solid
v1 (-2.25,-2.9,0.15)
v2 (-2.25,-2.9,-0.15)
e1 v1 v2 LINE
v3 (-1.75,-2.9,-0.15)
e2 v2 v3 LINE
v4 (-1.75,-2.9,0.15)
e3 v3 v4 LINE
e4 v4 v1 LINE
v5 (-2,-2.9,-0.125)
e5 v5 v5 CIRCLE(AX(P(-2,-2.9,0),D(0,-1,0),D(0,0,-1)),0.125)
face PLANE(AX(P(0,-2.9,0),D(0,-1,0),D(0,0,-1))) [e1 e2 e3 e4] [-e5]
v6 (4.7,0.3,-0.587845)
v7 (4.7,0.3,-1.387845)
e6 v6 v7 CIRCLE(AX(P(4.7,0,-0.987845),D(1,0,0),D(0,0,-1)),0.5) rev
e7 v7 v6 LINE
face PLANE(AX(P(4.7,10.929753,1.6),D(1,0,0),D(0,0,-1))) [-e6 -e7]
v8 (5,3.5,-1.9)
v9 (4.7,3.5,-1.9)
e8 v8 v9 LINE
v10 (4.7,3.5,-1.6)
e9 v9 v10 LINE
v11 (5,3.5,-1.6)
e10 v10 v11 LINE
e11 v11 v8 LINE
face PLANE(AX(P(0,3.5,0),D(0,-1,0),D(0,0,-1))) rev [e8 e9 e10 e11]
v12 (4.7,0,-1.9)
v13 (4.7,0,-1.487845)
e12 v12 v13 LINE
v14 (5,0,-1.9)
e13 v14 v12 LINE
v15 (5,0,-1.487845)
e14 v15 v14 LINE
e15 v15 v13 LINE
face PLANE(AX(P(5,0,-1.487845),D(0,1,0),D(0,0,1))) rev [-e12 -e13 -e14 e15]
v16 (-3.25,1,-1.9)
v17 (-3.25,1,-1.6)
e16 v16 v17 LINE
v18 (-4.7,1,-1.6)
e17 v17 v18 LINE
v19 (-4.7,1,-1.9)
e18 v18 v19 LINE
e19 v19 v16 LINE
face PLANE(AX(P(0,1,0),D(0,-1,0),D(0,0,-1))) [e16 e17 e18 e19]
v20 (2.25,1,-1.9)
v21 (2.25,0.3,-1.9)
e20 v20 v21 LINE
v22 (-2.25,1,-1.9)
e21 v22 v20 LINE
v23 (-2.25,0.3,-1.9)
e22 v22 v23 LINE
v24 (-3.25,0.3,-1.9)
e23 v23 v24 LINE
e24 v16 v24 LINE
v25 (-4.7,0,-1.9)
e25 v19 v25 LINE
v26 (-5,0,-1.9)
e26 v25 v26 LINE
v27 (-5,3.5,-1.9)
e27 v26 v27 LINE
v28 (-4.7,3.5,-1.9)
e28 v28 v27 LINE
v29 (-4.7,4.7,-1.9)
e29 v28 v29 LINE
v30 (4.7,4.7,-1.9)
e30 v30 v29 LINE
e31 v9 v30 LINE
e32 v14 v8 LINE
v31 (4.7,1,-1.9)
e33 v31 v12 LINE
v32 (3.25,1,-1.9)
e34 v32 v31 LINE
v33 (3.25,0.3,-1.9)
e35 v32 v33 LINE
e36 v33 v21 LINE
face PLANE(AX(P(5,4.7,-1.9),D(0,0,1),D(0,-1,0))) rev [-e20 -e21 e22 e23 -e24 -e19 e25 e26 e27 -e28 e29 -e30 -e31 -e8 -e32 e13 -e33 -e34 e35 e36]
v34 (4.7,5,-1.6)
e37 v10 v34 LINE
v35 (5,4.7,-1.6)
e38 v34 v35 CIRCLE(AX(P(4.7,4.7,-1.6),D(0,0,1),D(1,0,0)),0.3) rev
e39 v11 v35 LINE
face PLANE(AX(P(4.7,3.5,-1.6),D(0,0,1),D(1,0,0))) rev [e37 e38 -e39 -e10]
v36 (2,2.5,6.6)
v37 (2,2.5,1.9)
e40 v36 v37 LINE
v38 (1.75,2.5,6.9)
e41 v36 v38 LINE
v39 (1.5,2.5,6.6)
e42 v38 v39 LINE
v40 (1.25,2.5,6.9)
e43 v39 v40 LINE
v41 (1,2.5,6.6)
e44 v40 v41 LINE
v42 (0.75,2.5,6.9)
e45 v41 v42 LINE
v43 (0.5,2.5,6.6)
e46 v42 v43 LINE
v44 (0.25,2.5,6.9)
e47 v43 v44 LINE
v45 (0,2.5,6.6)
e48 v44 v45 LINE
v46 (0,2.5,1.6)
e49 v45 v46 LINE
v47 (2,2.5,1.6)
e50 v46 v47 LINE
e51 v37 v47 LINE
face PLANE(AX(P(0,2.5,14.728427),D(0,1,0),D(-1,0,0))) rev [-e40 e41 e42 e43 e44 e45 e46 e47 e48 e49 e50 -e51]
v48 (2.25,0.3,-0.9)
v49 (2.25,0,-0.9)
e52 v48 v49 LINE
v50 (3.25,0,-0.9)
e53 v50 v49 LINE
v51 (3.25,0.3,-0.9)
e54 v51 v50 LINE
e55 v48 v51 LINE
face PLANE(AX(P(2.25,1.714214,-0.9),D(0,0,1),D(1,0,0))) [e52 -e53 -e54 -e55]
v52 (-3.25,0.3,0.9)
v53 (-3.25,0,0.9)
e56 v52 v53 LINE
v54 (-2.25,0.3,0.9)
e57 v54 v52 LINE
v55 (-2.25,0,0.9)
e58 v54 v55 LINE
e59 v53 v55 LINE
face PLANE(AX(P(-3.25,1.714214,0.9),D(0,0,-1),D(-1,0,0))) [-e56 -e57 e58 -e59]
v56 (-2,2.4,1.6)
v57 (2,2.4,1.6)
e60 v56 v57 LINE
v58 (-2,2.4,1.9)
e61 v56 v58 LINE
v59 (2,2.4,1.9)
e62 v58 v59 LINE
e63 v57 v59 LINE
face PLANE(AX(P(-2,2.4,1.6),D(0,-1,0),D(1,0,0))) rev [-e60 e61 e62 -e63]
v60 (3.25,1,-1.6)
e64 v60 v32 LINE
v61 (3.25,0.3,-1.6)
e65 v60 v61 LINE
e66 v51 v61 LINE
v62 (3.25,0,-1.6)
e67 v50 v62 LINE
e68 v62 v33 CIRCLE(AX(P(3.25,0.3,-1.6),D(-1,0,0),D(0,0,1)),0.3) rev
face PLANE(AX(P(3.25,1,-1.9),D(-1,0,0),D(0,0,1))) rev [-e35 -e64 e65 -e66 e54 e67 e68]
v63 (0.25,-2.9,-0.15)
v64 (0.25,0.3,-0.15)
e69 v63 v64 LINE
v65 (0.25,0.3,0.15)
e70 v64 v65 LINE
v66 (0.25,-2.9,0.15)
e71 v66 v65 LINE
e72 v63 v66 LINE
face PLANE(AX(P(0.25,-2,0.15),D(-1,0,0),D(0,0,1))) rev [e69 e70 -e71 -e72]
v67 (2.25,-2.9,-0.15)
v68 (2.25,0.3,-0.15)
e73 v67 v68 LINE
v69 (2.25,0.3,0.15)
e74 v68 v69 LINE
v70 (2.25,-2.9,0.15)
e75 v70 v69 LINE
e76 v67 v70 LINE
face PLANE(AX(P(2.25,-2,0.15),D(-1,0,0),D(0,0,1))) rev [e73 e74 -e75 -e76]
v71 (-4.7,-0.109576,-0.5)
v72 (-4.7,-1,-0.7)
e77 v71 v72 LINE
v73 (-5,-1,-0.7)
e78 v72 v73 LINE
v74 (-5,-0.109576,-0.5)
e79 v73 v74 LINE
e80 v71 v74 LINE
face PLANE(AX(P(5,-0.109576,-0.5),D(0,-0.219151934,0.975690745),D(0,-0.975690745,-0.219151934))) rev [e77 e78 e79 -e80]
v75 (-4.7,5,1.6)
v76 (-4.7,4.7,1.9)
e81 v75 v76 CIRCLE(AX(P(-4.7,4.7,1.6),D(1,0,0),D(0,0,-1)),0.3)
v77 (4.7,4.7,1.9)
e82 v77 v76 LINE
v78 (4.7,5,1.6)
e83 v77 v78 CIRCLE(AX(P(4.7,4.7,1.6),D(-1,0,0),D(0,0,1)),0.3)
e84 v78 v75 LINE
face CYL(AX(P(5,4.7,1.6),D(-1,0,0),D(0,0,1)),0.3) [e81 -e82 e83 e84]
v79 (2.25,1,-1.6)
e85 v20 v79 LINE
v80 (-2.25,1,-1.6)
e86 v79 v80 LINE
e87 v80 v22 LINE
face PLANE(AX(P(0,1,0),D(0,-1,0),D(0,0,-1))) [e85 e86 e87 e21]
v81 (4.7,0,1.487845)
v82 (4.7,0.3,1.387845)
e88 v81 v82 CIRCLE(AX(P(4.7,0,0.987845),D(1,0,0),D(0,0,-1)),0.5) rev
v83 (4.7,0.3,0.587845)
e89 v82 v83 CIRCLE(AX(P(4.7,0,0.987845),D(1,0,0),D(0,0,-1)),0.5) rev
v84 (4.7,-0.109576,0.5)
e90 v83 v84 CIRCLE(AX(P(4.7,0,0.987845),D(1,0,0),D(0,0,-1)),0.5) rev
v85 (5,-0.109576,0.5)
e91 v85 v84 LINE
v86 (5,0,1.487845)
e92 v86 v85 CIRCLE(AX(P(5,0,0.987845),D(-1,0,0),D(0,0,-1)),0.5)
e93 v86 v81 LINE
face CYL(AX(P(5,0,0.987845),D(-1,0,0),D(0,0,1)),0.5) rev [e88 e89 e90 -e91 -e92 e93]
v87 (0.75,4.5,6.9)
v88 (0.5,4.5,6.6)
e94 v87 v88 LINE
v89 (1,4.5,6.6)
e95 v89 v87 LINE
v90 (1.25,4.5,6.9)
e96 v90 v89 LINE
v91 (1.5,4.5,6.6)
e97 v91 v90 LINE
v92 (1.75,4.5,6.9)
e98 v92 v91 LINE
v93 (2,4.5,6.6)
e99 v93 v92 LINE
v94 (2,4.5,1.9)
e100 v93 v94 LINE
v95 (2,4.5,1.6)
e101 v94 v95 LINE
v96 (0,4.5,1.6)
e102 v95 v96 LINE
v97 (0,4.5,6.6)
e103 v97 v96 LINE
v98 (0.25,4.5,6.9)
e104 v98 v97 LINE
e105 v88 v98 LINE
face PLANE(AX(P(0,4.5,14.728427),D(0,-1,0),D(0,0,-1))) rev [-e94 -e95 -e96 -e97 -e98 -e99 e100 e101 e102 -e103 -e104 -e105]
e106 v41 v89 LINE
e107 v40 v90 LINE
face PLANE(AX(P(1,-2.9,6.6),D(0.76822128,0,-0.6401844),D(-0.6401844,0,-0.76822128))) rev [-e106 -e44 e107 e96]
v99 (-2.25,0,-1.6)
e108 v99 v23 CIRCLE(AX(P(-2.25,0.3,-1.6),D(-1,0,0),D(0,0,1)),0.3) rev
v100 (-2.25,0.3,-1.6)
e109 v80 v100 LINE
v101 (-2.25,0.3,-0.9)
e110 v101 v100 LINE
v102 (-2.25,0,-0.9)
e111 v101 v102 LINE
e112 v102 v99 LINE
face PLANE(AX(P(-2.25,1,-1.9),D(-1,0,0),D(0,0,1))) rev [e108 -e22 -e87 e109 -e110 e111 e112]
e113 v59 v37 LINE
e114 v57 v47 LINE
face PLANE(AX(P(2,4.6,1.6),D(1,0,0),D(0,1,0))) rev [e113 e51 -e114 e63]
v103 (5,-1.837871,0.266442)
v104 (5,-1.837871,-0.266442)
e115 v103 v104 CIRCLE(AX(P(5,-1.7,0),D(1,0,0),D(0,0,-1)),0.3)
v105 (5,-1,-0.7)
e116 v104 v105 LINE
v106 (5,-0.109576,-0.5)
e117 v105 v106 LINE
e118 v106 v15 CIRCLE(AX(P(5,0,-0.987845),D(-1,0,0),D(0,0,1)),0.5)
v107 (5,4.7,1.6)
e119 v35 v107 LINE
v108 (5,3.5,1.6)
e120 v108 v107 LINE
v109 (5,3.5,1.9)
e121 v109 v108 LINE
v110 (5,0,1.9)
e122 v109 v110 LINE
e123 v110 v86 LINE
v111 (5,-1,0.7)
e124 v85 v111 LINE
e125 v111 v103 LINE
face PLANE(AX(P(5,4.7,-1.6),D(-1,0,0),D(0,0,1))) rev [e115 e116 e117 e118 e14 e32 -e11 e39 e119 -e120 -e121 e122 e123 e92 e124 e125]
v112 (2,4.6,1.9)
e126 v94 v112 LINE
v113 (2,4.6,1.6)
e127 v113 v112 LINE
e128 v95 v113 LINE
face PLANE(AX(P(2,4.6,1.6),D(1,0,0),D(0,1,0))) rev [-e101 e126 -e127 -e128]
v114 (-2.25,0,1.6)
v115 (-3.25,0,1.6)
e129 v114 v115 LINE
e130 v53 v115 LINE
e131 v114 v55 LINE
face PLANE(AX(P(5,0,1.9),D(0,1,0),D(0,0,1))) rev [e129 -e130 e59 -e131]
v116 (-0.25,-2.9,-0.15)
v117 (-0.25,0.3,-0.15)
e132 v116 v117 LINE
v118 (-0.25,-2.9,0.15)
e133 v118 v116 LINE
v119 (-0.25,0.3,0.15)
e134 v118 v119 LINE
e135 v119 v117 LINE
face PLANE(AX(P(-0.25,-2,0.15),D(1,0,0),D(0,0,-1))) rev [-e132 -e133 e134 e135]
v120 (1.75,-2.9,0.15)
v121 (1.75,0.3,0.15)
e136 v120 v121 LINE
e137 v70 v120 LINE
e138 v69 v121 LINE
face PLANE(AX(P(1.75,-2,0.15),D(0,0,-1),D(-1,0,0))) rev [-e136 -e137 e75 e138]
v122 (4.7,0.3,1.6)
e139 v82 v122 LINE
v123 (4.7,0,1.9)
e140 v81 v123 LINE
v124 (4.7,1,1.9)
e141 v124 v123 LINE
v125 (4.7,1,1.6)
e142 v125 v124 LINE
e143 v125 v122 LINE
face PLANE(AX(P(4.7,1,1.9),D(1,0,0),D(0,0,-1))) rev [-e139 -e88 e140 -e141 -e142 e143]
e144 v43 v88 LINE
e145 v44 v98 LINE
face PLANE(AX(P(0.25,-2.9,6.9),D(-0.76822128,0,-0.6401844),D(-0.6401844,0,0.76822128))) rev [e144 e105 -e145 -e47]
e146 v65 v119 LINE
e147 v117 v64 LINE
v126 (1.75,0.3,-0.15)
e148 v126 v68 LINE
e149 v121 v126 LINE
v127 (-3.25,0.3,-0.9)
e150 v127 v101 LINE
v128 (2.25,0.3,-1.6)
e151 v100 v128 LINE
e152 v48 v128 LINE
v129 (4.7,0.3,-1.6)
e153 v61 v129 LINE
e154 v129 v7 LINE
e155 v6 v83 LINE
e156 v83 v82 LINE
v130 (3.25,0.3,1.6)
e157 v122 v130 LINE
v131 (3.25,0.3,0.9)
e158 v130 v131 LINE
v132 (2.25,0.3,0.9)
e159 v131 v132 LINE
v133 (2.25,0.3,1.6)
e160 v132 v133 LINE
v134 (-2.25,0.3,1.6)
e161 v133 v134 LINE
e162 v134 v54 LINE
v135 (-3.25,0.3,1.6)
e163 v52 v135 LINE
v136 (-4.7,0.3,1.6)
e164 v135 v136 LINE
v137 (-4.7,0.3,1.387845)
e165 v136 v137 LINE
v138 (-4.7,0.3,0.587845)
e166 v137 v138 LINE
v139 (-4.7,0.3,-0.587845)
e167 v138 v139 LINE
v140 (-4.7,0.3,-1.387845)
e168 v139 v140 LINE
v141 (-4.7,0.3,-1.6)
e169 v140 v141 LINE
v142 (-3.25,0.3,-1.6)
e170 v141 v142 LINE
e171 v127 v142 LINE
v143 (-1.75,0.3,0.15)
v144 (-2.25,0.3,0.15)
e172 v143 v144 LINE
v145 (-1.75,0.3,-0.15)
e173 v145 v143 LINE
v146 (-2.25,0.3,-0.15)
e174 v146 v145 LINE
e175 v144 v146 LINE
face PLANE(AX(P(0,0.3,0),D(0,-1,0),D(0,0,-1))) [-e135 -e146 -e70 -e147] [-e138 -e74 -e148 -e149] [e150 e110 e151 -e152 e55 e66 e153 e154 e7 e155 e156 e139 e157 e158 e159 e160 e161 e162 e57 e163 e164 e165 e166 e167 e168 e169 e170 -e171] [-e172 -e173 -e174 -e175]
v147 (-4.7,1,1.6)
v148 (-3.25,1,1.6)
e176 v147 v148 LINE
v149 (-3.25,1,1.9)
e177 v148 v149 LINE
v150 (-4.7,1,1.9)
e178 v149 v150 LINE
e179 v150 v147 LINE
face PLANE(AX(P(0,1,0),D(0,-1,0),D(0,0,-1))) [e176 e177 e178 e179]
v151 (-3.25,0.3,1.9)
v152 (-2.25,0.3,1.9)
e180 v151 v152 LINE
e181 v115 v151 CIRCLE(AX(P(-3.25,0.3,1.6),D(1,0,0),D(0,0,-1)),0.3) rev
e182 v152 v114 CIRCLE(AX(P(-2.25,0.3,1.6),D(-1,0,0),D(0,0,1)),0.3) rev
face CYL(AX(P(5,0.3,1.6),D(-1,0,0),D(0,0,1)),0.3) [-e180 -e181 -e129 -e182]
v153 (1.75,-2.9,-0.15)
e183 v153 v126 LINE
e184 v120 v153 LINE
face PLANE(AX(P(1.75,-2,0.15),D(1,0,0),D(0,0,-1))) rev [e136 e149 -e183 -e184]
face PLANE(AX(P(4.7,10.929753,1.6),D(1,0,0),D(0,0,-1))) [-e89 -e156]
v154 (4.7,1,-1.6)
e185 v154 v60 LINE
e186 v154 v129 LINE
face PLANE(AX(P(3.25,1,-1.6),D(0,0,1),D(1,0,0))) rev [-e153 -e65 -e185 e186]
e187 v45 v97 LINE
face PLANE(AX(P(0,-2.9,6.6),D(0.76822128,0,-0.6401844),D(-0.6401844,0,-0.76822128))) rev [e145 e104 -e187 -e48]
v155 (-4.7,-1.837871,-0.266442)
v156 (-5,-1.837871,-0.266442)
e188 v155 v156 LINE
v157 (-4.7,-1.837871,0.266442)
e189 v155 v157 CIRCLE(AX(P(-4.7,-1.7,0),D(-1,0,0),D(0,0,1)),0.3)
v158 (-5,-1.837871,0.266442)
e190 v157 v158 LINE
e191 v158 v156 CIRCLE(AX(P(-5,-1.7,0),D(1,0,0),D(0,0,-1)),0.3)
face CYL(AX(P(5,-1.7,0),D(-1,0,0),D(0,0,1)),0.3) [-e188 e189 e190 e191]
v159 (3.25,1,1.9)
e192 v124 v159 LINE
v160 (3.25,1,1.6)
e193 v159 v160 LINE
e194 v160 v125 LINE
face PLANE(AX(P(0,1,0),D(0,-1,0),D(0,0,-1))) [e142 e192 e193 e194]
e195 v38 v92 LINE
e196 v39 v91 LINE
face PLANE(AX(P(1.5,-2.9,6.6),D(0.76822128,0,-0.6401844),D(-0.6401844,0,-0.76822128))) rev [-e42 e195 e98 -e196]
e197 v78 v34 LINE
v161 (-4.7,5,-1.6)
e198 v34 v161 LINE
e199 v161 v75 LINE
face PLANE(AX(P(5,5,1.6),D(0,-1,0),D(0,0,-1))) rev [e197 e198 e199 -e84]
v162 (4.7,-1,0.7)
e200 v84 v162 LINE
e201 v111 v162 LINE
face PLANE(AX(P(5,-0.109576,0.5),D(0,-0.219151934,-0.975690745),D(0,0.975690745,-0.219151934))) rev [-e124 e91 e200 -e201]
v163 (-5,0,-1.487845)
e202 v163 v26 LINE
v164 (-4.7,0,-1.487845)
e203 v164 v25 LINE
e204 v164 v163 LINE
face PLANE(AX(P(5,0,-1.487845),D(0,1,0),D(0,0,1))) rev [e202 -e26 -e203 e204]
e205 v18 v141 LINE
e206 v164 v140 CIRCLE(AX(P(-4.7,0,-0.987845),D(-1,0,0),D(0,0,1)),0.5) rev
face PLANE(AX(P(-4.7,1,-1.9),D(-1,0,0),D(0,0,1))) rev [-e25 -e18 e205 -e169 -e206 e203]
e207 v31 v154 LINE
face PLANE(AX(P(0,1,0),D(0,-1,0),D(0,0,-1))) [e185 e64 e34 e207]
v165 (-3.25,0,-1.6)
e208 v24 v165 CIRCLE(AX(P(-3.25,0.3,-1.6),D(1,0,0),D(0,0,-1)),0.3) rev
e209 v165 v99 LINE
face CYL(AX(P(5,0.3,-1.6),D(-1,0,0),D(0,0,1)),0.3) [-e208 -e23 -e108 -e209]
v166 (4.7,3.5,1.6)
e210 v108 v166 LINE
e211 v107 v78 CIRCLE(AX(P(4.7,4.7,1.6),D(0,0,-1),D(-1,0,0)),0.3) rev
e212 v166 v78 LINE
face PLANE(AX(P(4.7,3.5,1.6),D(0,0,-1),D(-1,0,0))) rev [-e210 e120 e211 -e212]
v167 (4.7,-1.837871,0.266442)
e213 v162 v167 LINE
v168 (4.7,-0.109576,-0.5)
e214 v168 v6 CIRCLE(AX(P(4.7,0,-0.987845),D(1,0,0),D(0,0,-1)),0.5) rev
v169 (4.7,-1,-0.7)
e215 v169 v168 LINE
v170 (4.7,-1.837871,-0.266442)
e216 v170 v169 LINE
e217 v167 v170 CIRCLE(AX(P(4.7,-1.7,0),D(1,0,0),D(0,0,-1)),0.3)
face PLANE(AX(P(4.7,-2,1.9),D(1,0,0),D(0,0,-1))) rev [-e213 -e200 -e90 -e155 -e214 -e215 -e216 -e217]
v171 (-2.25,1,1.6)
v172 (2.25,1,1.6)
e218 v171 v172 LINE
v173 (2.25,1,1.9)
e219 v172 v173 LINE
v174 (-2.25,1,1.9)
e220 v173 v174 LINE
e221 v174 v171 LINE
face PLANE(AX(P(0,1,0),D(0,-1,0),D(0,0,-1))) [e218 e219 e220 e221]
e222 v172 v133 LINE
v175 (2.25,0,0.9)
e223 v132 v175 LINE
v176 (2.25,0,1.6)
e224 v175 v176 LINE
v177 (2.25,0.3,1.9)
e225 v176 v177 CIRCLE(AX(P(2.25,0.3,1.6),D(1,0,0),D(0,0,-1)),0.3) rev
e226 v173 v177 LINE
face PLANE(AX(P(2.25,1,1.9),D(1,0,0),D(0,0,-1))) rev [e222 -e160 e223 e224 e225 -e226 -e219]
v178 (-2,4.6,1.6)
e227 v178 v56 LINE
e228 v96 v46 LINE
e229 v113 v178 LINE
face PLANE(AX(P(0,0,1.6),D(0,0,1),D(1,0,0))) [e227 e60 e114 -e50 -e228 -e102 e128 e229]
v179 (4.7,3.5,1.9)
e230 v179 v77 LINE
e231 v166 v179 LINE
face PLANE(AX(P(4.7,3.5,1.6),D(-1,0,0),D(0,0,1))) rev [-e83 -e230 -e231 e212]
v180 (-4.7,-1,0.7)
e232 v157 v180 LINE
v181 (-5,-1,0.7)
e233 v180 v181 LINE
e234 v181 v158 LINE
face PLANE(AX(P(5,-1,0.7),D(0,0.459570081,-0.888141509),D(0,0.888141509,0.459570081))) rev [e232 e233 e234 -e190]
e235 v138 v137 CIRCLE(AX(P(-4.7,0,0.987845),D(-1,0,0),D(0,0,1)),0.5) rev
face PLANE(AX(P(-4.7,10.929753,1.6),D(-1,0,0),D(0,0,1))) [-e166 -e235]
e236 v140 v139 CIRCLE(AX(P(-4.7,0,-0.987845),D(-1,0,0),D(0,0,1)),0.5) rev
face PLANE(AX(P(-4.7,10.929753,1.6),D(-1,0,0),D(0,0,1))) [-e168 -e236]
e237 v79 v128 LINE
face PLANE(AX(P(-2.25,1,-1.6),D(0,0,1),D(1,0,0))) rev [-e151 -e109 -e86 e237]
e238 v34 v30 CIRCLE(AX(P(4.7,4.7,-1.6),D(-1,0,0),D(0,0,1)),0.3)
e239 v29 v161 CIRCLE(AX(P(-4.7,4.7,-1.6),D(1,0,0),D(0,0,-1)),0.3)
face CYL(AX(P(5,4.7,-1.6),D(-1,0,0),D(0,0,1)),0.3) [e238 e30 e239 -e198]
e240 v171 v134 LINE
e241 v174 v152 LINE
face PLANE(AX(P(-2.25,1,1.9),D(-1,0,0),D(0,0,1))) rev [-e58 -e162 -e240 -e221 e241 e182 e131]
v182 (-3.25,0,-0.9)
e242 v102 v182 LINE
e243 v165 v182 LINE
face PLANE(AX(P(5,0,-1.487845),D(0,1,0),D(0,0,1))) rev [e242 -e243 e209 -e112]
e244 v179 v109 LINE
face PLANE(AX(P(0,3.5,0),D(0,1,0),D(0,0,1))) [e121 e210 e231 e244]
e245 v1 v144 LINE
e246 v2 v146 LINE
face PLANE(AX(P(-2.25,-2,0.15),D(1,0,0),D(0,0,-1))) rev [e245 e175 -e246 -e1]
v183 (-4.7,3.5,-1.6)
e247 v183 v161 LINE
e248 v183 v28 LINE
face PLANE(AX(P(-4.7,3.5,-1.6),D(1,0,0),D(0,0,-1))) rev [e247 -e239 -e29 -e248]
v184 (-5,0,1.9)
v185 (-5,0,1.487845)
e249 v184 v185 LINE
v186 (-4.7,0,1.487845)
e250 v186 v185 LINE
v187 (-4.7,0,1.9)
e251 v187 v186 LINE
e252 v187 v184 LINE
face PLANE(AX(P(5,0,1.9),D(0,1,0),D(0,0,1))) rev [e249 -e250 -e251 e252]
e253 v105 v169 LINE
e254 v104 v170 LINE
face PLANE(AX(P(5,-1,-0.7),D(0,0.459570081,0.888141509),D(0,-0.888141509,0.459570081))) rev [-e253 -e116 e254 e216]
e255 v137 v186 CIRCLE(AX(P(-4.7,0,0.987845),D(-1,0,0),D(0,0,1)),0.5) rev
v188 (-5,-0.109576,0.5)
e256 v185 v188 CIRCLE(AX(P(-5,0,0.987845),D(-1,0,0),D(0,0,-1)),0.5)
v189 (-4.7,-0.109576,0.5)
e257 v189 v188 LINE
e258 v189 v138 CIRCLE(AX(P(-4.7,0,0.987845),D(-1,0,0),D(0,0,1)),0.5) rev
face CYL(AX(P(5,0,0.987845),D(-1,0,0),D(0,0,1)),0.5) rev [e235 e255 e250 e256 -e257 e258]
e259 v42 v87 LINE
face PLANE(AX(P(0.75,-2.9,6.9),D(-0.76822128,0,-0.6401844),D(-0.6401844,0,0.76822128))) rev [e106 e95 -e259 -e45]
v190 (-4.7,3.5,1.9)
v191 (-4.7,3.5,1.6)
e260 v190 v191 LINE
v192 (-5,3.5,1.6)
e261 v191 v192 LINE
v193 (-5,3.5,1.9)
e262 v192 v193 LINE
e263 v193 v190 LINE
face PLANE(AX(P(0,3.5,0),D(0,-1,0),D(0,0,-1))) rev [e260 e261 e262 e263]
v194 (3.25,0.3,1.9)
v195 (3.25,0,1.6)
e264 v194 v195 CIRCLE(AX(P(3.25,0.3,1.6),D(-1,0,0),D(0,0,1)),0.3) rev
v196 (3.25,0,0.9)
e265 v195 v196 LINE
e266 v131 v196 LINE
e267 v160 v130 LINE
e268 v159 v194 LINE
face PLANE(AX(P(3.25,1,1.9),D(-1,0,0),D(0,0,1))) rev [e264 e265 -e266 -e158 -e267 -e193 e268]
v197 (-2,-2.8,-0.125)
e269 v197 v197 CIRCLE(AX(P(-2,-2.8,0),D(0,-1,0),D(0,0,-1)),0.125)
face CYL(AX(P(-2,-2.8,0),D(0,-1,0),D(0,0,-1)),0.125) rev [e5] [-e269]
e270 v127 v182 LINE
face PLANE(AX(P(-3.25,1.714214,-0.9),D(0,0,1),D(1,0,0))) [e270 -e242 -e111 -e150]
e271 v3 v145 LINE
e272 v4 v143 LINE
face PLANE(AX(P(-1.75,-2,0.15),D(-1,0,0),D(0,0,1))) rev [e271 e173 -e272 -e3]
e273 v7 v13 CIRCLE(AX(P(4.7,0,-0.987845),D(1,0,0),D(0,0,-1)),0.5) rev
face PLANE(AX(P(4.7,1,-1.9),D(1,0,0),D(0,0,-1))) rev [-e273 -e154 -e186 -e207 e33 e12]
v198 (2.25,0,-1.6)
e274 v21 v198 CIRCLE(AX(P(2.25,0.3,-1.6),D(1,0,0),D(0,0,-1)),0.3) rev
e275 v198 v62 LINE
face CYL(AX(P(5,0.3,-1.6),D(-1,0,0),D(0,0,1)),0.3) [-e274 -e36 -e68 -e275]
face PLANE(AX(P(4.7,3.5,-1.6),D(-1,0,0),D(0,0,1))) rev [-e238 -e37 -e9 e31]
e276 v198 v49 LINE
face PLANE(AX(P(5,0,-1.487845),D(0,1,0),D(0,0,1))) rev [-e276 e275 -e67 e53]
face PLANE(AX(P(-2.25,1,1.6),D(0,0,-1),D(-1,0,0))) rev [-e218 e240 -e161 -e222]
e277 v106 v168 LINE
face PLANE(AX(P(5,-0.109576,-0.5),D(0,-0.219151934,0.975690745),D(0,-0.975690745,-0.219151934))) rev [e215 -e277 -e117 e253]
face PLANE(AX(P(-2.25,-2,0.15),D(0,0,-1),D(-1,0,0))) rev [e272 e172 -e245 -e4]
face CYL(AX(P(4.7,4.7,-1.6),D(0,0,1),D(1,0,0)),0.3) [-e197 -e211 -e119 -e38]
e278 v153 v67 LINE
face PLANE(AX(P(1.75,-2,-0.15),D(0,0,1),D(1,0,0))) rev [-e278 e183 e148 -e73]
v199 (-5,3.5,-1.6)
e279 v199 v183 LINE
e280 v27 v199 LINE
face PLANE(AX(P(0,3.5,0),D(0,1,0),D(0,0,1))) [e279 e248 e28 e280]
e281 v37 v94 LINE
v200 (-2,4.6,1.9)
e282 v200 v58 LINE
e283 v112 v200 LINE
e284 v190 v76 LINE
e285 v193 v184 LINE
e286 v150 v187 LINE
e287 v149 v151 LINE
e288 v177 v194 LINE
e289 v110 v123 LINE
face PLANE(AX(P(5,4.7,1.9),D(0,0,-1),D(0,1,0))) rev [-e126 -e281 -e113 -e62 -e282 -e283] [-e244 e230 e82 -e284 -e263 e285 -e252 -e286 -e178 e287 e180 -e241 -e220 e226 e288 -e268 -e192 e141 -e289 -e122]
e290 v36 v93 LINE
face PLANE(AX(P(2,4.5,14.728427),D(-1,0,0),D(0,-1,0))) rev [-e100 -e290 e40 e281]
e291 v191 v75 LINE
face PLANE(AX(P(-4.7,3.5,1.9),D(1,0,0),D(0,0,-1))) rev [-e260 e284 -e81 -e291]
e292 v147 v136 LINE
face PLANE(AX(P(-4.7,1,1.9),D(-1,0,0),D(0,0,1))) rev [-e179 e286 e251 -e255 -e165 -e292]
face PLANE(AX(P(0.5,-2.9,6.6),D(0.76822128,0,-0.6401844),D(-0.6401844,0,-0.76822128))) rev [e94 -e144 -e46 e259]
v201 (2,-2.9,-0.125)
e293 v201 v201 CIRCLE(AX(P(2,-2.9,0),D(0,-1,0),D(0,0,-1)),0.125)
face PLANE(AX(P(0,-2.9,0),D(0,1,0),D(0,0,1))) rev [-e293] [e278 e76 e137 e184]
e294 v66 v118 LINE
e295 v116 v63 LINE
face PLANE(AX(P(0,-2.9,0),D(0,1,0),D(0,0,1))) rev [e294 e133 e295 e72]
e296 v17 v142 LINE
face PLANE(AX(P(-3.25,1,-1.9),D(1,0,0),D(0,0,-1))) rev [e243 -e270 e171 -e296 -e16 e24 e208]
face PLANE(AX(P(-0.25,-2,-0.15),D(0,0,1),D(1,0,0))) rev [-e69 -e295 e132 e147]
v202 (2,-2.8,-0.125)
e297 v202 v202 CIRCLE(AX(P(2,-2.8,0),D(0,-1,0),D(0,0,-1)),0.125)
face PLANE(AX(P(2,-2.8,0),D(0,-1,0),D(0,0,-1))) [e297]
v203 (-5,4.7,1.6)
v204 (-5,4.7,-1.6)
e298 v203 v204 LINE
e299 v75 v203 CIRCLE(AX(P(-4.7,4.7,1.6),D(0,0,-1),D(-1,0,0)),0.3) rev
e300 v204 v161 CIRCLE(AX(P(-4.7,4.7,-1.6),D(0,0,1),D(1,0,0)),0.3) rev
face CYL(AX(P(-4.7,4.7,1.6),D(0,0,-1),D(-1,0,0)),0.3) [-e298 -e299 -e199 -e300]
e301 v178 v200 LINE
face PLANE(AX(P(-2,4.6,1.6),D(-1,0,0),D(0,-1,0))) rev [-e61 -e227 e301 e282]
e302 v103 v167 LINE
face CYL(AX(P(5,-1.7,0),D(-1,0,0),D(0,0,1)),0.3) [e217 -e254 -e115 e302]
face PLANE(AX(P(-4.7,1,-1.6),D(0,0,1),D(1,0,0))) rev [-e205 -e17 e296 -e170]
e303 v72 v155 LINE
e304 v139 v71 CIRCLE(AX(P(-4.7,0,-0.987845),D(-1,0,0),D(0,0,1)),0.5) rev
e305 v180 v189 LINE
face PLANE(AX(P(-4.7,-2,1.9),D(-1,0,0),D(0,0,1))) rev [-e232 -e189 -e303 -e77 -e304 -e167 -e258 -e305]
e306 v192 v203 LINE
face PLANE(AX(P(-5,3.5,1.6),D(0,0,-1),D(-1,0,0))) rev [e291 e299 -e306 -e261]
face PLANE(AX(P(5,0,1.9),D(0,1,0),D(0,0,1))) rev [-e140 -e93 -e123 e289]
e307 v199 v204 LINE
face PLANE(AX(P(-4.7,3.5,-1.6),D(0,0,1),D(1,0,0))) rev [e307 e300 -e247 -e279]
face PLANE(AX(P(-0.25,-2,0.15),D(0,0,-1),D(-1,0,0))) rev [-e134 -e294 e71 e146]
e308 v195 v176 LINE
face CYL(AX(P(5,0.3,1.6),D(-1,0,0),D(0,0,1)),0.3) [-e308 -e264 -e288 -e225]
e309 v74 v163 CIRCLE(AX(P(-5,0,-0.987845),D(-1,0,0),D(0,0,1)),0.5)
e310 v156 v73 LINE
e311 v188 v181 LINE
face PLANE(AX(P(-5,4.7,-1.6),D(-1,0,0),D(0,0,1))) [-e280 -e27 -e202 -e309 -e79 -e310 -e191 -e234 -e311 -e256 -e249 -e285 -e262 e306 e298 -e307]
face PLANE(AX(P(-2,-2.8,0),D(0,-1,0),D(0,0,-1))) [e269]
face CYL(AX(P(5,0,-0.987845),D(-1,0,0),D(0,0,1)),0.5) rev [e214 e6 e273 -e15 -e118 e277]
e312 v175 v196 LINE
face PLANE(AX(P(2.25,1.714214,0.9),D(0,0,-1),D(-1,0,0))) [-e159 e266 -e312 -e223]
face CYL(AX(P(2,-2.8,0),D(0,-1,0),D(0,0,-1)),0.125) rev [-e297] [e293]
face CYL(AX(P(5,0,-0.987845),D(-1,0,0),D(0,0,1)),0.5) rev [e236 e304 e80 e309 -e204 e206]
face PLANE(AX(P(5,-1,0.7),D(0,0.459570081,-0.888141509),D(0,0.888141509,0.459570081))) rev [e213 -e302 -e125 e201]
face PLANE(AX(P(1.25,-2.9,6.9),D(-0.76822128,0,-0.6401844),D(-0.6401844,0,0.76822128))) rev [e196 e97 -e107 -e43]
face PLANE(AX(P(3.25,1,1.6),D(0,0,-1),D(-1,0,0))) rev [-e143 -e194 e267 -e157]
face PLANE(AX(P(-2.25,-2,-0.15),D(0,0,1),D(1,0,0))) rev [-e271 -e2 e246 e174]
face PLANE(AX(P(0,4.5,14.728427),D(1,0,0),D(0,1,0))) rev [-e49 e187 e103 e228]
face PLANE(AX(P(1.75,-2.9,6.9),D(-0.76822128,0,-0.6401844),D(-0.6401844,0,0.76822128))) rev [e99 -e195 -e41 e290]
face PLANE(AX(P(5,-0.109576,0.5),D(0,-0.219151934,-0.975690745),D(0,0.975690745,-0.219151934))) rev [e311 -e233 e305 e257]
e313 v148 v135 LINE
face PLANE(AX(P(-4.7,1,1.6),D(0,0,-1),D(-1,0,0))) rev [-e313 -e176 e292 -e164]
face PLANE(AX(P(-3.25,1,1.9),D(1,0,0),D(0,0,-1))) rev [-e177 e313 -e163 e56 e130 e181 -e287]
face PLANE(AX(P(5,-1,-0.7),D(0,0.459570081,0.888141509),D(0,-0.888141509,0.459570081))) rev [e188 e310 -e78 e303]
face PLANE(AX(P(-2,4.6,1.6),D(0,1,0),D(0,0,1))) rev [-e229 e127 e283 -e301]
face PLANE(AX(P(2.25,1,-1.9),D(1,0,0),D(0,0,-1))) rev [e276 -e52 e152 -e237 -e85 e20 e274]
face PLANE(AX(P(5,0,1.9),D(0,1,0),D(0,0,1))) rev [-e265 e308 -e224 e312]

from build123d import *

# Parameters (mm, degrees)
BOSS_EXTRUDE1_DEPTH = 5
SKETCH3_OUTSIDE_W   = 14.556
SKETCH3_OUTSIDE_H   = 8.356
SKETCH3_OUTSIDE_W_2 = 0.5
SKETCH3_OUTSIDE_H_2 = 0.3
SKETCH3_OUTSIDE_W_3 = 0.3
SKETCH3_OUTSIDE_H_3 = 3.8
CUT_EXTRUDE1_DEPTH  = 8.321885003
SKETCH4_W           = 0.5
SKETCH4_H           = 0.3
BOSS_EXTRUDE2_DEPTH = 2.9
SKETCH5_W           = 1.45
SKETCH5_H           = 0.3
SKETCH5_W_2         = 4.5
CUT_EXTRUDE2_DEPTH  = 1
SKETCH6_W           = 9.4
SKETCH6_H           = 3.2
SKETCH6_W_2         = 0.5
SKETCH6_H_2         = 0.3
CUT_EXTRUDE3_DEPTH  = 0.3
SKETCH7_W           = 9.4
SKETCH7_H           = 3.2
BOSS_EXTRUDE3_DEPTH = 0.7
SKETCH8_W           = 1
SKETCH8_H           = 1
BOSS_EXTRUDE4_DEPTH = 0.3
FILLET2_R           = 0.3
SKETCH9_W           = 4
SKETCH9_H           = 2.2
CUT_EXTRUDE4_DEPTH  = 0.3
SKETCH10_W          = 2
SKETCH10_H          = 2
BOSS_EXTRUDE5_DEPTH = 5.3
CUT_EXTRUDE5_DEPTH  = 12.285831826
SKETCH12_R          = 0.125
CUT_EXTRUDE6_DEPTH  = 0.1
SKETCH13_W          = 0.3
SKETCH13_H          = 0.3
CUT_EXTRUDE7_DEPTH  = 1.5


with BuildPart() as part:
    # Sketch2 → Boss-Extrude1 (new, symmetric)
    with BuildSketch(Plane(origin=(0, 0, 0), x_dir=(0, 0, -1), z_dir=(1, 0, 0))):
        with BuildLine():
            Line((-1.6, 5), (1.6, 5))
            ThreePointArc((1.6, 5), (1.812132034, 4.912132034), (1.9, 4.7))
            Line((1.9, 4.7), (1.9, 0))
            Line((1.9, 0), (1.487845372, 0))
            ThreePointArc((1.487845372, 0), (0.932721359, 0.496952053), (0.5, -0.109575967))
            Line((0.5, -0.109575967), (0.7, -1))
            Line((0.7, -1), (0.266442453, -1.837871024))
            ThreePointArc((0.266442453, -1.837871024), (0, -2), (-0.266442453, -1.837871024))
            Line((-0.266442453, -1.837871024), (-0.7, -1))
            Line((-0.7, -1), (-0.5, -0.109575967))
            ThreePointArc((-0.5, -0.109575967), (-0.932721359, 0.496952053), (-1.487845372, 0))
            Line((-1.487845372, 0), (-1.9, 0))
            Line((-1.9, 0), (-1.9, 4.7))
            ThreePointArc((-1.9, 4.7), (-1.812132034, 4.912132034), (-1.6, 5))
        make_face()
    extrude(amount=BOSS_EXTRUDE1_DEPTH, both=True)

    # Sketch3 outside → Cut-Extrude1 (cut, through all)
    with BuildSketch(Plane.XZ):
        Rectangle(SKETCH3_OUTSIDE_W, SKETCH3_OUTSIDE_H)
        with Locations((-2, 0)):
            Rectangle(SKETCH3_OUTSIDE_W_2, SKETCH3_OUTSIDE_H_2, mode=Mode.SUBTRACT)
        Rectangle(SKETCH3_OUTSIDE_W_2, SKETCH3_OUTSIDE_H_2, mode=Mode.SUBTRACT)
        with Locations((2, 0)):
            Rectangle(SKETCH3_OUTSIDE_W_2, SKETCH3_OUTSIDE_H_2, mode=Mode.SUBTRACT)
        with Locations((-4.85, 0)):
            Rectangle(SKETCH3_OUTSIDE_W_3, SKETCH3_OUTSIDE_H_3, mode=Mode.SUBTRACT)
        with Locations((4.85, 0)):
            Rectangle(SKETCH3_OUTSIDE_W_3, SKETCH3_OUTSIDE_H_3, mode=Mode.SUBTRACT)
    extrude(amount=CUT_EXTRUDE1_DEPTH, mode=Mode.SUBTRACT)

    # Sketch4 → Boss-Extrude2 (add)
    with BuildSketch(Plane.XZ):
        with Locations((-2, 0)):
            Rectangle(SKETCH4_W, SKETCH4_H)
        Rectangle(SKETCH4_W, SKETCH4_H)
        with Locations((2, 0)):
            Rectangle(SKETCH4_W, SKETCH4_H)
    extrude(amount=BOSS_EXTRUDE2_DEPTH)

    # Sketch5 → Cut-Extrude2 (cut)
    with BuildSketch(Plane.XZ):
        with Locations((-3.975, 1.75)):
            Rectangle(SKETCH5_W, SKETCH5_H)
        with Locations((0, 1.75)):
            Rectangle(SKETCH5_W_2, SKETCH5_H)
        with Locations((3.975, 1.75)):
            Rectangle(SKETCH5_W, SKETCH5_H)
        with Locations((3.975, -1.75)):
            Rectangle(SKETCH5_W, SKETCH5_H)
        with Locations((0, -1.75)):
            Rectangle(SKETCH5_W_2, SKETCH5_H)
        with Locations((-3.975, -1.75)):
            Rectangle(SKETCH5_W, SKETCH5_H)
    extrude(amount=-CUT_EXTRUDE2_DEPTH, mode=Mode.SUBTRACT)

    # Sketch6 → Cut-Extrude3 (cut)
    with BuildSketch(Plane.XZ):
        Rectangle(SKETCH6_W, SKETCH6_H)
        with Locations((-2, 0)):
            Rectangle(SKETCH6_W_2, SKETCH6_H_2, mode=Mode.SUBTRACT)
        Rectangle(SKETCH6_W_2, SKETCH6_H_2, mode=Mode.SUBTRACT)
        with Locations((2, 0)):
            Rectangle(SKETCH6_W_2, SKETCH6_H_2, mode=Mode.SUBTRACT)
    extrude(amount=-CUT_EXTRUDE3_DEPTH, mode=Mode.SUBTRACT)

    # Sketch7 → Boss-Extrude3 (add)
    with BuildSketch(Plane.XZ.offset(-0.3)):
        Rectangle(SKETCH7_W, SKETCH7_H)
    extrude(amount=-BOSS_EXTRUDE3_DEPTH)

    # Sketch8 → Boss-Extrude4 (add)
    with BuildSketch(Plane.XZ):
        with Locations((-2.75, 1.4)):
            Rectangle(SKETCH8_W, SKETCH8_H)
        with Locations((2.75, 1.4)):
            Rectangle(SKETCH8_W, SKETCH8_H)
        with Locations((2.75, -1.4)):
            Rectangle(SKETCH8_W, SKETCH8_H)
        with Locations((-2.75, -1.4)):
            Rectangle(SKETCH8_W, SKETCH8_H)
    extrude(amount=-BOSS_EXTRUDE4_DEPTH)

    # Fillet2
    # the kernel refuses this fillet: 0.3 mm, written as the material it takes off along each edge
    with BuildSketch(Plane(origin=(-5, 5, 2.35), x_dir=(1, 0, 0), z_dir=(0, 0, -1)), Plane(origin=(5, 5, 2.35), x_dir=(0, -1, 0), z_dir=(0, 0, -1))) as fillet2_piece_1:
        with BuildLine():
            CenterArc((FILLET2_R, FILLET2_R), FILLET2_R, 180, 90)
            Line((0, FILLET2_R), (0, 0))
            Line((0, 0), (FILLET2_R, 0))
        make_face()
    extrude(amount=4.7, mode=Mode.SUBTRACT)
    with BuildSketch(Plane(origin=(1.5, 0, 1.9), x_dir=(0, 0, -1), z_dir=(1, 0, 0)), Plane(origin=(-4, 0, 1.9), x_dir=(0, 0, -1), z_dir=(1, 0, 0))) as fillet2_piece_2:
        with BuildLine():
            CenterArc((FILLET2_R, FILLET2_R), FILLET2_R, 180, 90)
            Line((0, FILLET2_R), (0, 0))
            Line((0, 0), (FILLET2_R, 0))
        make_face()
    extrude(amount=2.5, mode=Mode.SUBTRACT)
    with BuildSketch(Plane(origin=(1.5, 0, -1.9), x_dir=(0, 0, 1), z_dir=(1, 0, 0)), Plane(origin=(-4, 0, -1.9), x_dir=(0, 0, 1), z_dir=(1, 0, 0))) as fillet2_piece_3:
        with BuildLine():
            CenterArc((FILLET2_R, -FILLET2_R), FILLET2_R, 90, 90)
            Line((0, -FILLET2_R), (0, 0))
            Line((0, 0), (FILLET2_R, 0))
        make_face()
    extrude(amount=2.5, mode=Mode.SUBTRACT)

    # Sketch9 → Cut-Extrude4 (cut)
    with BuildSketch(Plane.XY.offset(1.9)):
        with Locations((0, 3.5)):
            Rectangle(SKETCH9_W, SKETCH9_H)
    extrude(amount=-CUT_EXTRUDE4_DEPTH, mode=Mode.SUBTRACT)

    # Sketch10 → Boss-Extrude5 (add)
    with BuildSketch(Plane.XY.offset(1.6)):
        with Locations((1, 3.5)):
            Rectangle(SKETCH10_W, SKETCH10_H)
    extrude(amount=BOSS_EXTRUDE5_DEPTH)

    # Sketch11 → Cut-Extrude5 (cut, through all)
    with BuildSketch(Plane(origin=(0, 4.5, 0), x_dir=(1, 0, 0), z_dir=(0, 1, 0))):
        Polygon((0, -6.6), (0.25, -6.9), (0.5, -6.6), (0.75, -6.9), (1, -6.6), (1.25, -6.9), (1.5, -6.6), (1.75, -6.9), (2, -6.6), (2.5, -6.6), (2.5, -7.4), (-0.5, -7.4), (-0.5, -6.6), align=None)
    extrude(amount=-CUT_EXTRUDE5_DEPTH, mode=Mode.SUBTRACT)

    # Sketch12 → Cut-Extrude6 (cut)
    with BuildSketch(Plane.XZ.offset(2.9)):
        with Locations(Location((-2, 0, 0), (0, 0, 270))):
            Circle(SKETCH12_R)
        with Locations(Location((2, 0, 0), (0, 0, 270))):
            Circle(SKETCH12_R)
    extrude(amount=-CUT_EXTRUDE6_DEPTH, mode=Mode.SUBTRACT)

    # Sketch13 → Cut-Extrude7 (cut)
    with BuildSketch(Plane(origin=(0, 5, 0), x_dir=(1, 0, 0), z_dir=(0, 1, 0))):
        with Locations((-4.85, -1.75)):
            Rectangle(SKETCH13_W, SKETCH13_H)
        with Locations((-4.85, 1.75)):
            Rectangle(SKETCH13_W, SKETCH13_H)
        with Locations((4.85, 1.75)):
            Rectangle(SKETCH13_W, SKETCH13_H)
        with Locations((4.85, -1.75)):
            Rectangle(SKETCH13_W, SKETCH13_H)
    extrude(amount=-CUT_EXTRUDE7_DEPTH, mode=Mode.SUBTRACT)


solid = part.part
